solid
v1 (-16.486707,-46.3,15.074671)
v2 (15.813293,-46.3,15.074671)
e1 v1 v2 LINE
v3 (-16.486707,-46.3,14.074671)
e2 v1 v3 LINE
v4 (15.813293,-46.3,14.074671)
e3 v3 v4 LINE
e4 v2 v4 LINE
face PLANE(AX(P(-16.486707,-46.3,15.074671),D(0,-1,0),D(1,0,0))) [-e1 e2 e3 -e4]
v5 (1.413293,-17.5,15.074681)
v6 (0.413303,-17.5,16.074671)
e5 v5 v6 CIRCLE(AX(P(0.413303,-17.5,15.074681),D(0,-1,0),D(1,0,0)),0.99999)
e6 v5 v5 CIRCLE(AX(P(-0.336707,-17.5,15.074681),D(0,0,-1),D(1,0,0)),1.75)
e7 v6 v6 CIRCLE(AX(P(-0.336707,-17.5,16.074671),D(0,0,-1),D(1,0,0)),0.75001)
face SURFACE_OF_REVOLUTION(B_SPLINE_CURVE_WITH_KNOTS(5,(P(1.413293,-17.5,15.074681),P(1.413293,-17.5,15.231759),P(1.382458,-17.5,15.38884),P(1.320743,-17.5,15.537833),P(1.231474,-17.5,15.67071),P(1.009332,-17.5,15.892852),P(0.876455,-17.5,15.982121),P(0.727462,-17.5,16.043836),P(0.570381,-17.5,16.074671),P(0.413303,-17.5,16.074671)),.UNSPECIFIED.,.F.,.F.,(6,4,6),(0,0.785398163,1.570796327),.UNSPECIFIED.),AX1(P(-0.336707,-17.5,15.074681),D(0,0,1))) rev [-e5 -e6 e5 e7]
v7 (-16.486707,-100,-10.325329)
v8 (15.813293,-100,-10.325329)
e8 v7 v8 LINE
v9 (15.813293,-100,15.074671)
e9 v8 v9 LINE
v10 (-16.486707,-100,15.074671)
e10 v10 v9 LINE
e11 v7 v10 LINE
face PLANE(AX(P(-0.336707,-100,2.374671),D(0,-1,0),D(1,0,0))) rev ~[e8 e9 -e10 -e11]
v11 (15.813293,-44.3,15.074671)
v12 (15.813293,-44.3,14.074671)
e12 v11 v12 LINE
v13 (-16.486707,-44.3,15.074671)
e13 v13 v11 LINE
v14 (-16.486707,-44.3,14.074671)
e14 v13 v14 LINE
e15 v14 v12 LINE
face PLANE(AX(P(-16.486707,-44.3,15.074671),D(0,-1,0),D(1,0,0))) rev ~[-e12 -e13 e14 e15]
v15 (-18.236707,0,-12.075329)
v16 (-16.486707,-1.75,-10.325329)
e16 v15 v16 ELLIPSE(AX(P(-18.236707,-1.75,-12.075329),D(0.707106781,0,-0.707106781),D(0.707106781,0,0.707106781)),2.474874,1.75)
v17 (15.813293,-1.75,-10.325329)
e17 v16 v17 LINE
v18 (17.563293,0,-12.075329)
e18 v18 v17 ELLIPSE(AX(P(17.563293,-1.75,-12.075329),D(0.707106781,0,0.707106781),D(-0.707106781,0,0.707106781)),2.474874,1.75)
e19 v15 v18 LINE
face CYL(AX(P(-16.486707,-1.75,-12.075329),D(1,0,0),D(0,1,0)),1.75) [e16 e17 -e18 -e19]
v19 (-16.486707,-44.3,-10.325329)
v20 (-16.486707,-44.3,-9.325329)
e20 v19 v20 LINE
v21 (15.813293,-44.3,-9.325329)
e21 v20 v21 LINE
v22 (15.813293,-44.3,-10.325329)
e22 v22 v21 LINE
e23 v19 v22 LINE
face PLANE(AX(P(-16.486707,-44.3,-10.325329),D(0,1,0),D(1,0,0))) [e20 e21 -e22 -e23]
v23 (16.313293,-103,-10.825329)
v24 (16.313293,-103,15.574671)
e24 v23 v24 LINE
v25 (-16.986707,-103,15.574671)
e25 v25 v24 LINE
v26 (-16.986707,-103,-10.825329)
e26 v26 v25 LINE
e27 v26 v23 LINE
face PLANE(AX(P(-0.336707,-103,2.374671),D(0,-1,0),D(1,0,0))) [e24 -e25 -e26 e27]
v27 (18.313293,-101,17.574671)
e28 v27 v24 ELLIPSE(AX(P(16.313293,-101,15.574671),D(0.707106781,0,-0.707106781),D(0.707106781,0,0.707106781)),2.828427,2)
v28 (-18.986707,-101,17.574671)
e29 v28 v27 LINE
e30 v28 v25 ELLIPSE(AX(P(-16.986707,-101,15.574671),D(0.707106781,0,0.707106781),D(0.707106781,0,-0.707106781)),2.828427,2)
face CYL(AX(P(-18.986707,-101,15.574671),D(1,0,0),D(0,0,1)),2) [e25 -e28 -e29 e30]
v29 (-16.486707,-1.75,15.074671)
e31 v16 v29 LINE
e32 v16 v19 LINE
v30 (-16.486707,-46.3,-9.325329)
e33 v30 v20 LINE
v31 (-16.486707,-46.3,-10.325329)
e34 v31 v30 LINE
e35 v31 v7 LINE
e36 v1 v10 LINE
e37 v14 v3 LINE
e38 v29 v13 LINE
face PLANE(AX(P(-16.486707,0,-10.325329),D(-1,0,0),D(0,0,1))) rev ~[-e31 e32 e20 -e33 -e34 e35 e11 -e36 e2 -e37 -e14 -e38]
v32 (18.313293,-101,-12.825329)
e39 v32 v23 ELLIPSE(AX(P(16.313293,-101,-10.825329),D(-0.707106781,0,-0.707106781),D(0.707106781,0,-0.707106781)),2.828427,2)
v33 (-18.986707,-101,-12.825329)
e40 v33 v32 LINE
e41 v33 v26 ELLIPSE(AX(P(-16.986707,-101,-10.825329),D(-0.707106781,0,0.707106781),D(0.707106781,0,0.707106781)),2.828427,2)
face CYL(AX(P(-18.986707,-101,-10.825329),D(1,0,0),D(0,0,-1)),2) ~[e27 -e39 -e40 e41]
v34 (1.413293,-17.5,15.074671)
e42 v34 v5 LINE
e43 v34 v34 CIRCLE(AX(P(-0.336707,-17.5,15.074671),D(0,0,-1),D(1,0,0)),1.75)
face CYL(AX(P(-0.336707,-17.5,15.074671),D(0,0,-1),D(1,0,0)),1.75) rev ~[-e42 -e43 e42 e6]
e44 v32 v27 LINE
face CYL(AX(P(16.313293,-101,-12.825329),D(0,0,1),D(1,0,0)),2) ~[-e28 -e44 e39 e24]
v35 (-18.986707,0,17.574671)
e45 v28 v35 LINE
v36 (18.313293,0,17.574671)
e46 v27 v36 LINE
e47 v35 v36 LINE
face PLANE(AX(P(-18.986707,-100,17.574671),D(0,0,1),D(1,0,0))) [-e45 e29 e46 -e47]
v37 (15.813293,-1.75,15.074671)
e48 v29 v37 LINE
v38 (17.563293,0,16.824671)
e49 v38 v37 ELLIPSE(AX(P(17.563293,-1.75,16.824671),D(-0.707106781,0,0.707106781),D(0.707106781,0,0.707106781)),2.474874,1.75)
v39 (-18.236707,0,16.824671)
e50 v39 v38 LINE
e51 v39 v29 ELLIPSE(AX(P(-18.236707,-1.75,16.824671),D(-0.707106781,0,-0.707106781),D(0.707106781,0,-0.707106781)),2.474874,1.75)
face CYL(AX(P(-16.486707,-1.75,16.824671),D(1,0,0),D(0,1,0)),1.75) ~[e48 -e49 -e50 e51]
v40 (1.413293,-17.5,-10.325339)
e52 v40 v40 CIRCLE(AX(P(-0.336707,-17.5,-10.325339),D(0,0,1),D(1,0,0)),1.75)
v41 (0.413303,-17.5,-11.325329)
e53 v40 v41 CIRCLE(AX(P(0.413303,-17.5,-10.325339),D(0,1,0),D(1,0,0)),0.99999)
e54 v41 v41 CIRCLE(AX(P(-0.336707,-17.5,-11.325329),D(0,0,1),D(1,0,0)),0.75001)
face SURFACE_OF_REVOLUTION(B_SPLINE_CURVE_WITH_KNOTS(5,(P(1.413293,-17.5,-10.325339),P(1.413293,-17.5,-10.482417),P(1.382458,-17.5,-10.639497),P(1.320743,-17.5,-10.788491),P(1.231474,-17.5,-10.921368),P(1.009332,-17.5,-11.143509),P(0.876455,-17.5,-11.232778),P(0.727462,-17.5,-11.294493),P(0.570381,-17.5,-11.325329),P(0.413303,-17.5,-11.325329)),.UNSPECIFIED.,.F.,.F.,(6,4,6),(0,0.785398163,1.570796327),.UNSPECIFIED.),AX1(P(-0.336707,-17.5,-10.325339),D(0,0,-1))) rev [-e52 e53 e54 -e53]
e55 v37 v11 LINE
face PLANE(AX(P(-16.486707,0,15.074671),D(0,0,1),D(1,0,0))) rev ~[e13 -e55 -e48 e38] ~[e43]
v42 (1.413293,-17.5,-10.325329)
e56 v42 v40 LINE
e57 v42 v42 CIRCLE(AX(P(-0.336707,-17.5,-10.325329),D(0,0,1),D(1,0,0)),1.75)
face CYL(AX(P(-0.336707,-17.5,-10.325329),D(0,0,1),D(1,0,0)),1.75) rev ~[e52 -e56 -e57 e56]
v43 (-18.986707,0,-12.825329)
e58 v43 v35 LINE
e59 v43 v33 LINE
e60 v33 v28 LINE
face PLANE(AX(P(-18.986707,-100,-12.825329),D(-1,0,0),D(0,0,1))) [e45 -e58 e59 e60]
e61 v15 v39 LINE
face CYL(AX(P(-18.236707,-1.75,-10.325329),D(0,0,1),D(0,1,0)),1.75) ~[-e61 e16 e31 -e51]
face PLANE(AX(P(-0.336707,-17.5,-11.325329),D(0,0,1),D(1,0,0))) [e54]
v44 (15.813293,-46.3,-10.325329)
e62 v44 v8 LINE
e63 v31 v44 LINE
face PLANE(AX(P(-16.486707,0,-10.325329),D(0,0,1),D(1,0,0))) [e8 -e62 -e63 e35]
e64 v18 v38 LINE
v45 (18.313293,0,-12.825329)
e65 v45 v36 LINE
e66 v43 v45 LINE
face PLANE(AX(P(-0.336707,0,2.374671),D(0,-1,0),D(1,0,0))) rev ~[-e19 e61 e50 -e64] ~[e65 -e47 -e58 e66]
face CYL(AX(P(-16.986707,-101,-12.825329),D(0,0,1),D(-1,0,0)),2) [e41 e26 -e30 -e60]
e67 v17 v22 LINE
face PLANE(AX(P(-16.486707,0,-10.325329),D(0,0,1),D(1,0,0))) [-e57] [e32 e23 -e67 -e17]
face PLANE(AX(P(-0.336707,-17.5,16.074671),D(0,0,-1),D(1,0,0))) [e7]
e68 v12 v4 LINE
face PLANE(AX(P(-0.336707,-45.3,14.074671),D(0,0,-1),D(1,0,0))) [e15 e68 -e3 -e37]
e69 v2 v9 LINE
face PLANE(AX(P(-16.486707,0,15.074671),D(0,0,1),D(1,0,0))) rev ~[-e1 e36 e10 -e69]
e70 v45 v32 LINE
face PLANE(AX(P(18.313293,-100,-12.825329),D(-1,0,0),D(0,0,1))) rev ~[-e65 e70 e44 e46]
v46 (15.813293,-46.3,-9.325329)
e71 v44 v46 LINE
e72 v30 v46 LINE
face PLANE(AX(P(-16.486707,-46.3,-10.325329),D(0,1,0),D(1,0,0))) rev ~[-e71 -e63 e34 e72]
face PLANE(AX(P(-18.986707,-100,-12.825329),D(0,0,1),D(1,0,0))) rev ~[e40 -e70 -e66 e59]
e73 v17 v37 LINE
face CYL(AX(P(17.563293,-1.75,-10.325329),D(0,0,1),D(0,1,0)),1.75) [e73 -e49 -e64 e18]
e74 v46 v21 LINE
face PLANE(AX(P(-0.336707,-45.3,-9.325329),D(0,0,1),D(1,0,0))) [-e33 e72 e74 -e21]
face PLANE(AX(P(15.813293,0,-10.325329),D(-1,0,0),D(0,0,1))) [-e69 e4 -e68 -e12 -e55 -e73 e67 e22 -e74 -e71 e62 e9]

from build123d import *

# Parameters (mm, degrees)
F0_W      = 37.3
F0_H      = 30.4
F0_W_2    = 32.3
F0_H_2    = 25.4
F1_DEPTH  = 100
F2_W      = 37.3
F2_H      = 30.4
F3_DEPTH  = 3
F4_R      = 2
F5_R      = 1.75
F6_R      = 1.75
F7_DEPTH  = 1
F8_R      = 0.99999
F9_R      = 1.75
F10_DEPTH = 1
F11_R     = 0.99999
F12_W     = 32.3
F12_H     = 2
F13_DEPTH = 1
F14_W     = 32.3
F14_H     = 2
F15_DEPTH = 1


# Not quite as in the source:
# - a fillet or chamfer is up to 0.001 mm smaller than in the source, because OpenCascade refuses the exact size


with BuildPart() as f1:
    # F0 (on Front) → F1 (new body)
    with BuildSketch(Plane.XZ):
        with Locations((-0.3367068468, 2.3746712297)):
            Rectangle(F0_W, F0_H)
        with Locations((-0.3367068468, 2.3746712297)):
            Rectangle(F0_W_2, F0_H_2, mode=Mode.SUBTRACT)
    extrude(amount=F1_DEPTH)

    # F2 (on face) → F3 (join)
    with BuildSketch(Plane.XZ.offset(100)):
        with Locations((-0.3367068468, 2.3746712297)):
            Rectangle(F2_W, F2_H)
    extrude(amount=F3_DEPTH)

    # F4
    f4_edges = [f1.edges().sort_by_distance(p)[0] for p in [
        (-0.336707, -103, 17.574671),
        (-18.986707, -103, 2.374671),
        (-0.336707, -103, -12.825329),
        (18.313293, -103, 2.374671),
    ]]
    fillet(f4_edges, radius=F4_R)

    # F5
    f5_edges = [f1.edges().sort_by_distance(p)[0] for p in [
        (15.813293, 0, 2.374671),
        (-0.336707, 0, 15.074671),
        (-16.486707, 0, 2.374671),
        (-0.336707, 0, -10.325329),
    ]]
    fillet(f5_edges, radius=F5_R)

    # F6 (on face) → F7 (cut)
    with BuildSketch(Plane.XY.offset(-10.3253287703)):
        with Locations((-0.3367068468, -17.5)):
            Circle(F6_R)
    extrude(amount=-F7_DEPTH, mode=Mode.SUBTRACT)

    # F8 (radius 1 in the source; OpenCascade refuses exactly that, so slightly less here)
    f8_edges = [f1.edges().sort_by_distance(p)[0] for p in [
        (-2.086707, -17.5, -11.325329),
    ]]
    fillet(f8_edges, radius=F8_R)

    # F9 (on face) → F10 (cut)
    with BuildSketch(Plane(origin=(0, 0, 15.0746712297), x_dir=(1, 0, 0), z_dir=(0, 0, -1))):
        with Locations((-0.3367068468, 17.5)):
            Circle(F9_R)
    extrude(amount=-F10_DEPTH, mode=Mode.SUBTRACT)

    # F11 (radius 1 in the source; OpenCascade refuses exactly that, so slightly less here)
    f11_edges = [f1.edges().sort_by_distance(p)[0] for p in [
        (-2.086707, -17.5, 16.074671),
    ]]
    fillet(f11_edges, radius=F11_R)

    # F12 (on face) → F13 (join)
    with BuildSketch(Plane.XY.offset(-10.3253287703)):
        with Locations((-0.3367068468, -45.3)):
            Rectangle(F12_W, F12_H)
    extrude(amount=F13_DEPTH)

    # F14 (on face) → F15 (join)
    with BuildSketch(Plane(origin=(0, 0, 15.0746712297), x_dir=(1, 0, 0), z_dir=(0, 0, -1))):
        with Locations((-0.3367068468, 45.3)):
            Rectangle(F14_W, F14_H)
    extrude(amount=F15_DEPTH)


solid = f1.part
